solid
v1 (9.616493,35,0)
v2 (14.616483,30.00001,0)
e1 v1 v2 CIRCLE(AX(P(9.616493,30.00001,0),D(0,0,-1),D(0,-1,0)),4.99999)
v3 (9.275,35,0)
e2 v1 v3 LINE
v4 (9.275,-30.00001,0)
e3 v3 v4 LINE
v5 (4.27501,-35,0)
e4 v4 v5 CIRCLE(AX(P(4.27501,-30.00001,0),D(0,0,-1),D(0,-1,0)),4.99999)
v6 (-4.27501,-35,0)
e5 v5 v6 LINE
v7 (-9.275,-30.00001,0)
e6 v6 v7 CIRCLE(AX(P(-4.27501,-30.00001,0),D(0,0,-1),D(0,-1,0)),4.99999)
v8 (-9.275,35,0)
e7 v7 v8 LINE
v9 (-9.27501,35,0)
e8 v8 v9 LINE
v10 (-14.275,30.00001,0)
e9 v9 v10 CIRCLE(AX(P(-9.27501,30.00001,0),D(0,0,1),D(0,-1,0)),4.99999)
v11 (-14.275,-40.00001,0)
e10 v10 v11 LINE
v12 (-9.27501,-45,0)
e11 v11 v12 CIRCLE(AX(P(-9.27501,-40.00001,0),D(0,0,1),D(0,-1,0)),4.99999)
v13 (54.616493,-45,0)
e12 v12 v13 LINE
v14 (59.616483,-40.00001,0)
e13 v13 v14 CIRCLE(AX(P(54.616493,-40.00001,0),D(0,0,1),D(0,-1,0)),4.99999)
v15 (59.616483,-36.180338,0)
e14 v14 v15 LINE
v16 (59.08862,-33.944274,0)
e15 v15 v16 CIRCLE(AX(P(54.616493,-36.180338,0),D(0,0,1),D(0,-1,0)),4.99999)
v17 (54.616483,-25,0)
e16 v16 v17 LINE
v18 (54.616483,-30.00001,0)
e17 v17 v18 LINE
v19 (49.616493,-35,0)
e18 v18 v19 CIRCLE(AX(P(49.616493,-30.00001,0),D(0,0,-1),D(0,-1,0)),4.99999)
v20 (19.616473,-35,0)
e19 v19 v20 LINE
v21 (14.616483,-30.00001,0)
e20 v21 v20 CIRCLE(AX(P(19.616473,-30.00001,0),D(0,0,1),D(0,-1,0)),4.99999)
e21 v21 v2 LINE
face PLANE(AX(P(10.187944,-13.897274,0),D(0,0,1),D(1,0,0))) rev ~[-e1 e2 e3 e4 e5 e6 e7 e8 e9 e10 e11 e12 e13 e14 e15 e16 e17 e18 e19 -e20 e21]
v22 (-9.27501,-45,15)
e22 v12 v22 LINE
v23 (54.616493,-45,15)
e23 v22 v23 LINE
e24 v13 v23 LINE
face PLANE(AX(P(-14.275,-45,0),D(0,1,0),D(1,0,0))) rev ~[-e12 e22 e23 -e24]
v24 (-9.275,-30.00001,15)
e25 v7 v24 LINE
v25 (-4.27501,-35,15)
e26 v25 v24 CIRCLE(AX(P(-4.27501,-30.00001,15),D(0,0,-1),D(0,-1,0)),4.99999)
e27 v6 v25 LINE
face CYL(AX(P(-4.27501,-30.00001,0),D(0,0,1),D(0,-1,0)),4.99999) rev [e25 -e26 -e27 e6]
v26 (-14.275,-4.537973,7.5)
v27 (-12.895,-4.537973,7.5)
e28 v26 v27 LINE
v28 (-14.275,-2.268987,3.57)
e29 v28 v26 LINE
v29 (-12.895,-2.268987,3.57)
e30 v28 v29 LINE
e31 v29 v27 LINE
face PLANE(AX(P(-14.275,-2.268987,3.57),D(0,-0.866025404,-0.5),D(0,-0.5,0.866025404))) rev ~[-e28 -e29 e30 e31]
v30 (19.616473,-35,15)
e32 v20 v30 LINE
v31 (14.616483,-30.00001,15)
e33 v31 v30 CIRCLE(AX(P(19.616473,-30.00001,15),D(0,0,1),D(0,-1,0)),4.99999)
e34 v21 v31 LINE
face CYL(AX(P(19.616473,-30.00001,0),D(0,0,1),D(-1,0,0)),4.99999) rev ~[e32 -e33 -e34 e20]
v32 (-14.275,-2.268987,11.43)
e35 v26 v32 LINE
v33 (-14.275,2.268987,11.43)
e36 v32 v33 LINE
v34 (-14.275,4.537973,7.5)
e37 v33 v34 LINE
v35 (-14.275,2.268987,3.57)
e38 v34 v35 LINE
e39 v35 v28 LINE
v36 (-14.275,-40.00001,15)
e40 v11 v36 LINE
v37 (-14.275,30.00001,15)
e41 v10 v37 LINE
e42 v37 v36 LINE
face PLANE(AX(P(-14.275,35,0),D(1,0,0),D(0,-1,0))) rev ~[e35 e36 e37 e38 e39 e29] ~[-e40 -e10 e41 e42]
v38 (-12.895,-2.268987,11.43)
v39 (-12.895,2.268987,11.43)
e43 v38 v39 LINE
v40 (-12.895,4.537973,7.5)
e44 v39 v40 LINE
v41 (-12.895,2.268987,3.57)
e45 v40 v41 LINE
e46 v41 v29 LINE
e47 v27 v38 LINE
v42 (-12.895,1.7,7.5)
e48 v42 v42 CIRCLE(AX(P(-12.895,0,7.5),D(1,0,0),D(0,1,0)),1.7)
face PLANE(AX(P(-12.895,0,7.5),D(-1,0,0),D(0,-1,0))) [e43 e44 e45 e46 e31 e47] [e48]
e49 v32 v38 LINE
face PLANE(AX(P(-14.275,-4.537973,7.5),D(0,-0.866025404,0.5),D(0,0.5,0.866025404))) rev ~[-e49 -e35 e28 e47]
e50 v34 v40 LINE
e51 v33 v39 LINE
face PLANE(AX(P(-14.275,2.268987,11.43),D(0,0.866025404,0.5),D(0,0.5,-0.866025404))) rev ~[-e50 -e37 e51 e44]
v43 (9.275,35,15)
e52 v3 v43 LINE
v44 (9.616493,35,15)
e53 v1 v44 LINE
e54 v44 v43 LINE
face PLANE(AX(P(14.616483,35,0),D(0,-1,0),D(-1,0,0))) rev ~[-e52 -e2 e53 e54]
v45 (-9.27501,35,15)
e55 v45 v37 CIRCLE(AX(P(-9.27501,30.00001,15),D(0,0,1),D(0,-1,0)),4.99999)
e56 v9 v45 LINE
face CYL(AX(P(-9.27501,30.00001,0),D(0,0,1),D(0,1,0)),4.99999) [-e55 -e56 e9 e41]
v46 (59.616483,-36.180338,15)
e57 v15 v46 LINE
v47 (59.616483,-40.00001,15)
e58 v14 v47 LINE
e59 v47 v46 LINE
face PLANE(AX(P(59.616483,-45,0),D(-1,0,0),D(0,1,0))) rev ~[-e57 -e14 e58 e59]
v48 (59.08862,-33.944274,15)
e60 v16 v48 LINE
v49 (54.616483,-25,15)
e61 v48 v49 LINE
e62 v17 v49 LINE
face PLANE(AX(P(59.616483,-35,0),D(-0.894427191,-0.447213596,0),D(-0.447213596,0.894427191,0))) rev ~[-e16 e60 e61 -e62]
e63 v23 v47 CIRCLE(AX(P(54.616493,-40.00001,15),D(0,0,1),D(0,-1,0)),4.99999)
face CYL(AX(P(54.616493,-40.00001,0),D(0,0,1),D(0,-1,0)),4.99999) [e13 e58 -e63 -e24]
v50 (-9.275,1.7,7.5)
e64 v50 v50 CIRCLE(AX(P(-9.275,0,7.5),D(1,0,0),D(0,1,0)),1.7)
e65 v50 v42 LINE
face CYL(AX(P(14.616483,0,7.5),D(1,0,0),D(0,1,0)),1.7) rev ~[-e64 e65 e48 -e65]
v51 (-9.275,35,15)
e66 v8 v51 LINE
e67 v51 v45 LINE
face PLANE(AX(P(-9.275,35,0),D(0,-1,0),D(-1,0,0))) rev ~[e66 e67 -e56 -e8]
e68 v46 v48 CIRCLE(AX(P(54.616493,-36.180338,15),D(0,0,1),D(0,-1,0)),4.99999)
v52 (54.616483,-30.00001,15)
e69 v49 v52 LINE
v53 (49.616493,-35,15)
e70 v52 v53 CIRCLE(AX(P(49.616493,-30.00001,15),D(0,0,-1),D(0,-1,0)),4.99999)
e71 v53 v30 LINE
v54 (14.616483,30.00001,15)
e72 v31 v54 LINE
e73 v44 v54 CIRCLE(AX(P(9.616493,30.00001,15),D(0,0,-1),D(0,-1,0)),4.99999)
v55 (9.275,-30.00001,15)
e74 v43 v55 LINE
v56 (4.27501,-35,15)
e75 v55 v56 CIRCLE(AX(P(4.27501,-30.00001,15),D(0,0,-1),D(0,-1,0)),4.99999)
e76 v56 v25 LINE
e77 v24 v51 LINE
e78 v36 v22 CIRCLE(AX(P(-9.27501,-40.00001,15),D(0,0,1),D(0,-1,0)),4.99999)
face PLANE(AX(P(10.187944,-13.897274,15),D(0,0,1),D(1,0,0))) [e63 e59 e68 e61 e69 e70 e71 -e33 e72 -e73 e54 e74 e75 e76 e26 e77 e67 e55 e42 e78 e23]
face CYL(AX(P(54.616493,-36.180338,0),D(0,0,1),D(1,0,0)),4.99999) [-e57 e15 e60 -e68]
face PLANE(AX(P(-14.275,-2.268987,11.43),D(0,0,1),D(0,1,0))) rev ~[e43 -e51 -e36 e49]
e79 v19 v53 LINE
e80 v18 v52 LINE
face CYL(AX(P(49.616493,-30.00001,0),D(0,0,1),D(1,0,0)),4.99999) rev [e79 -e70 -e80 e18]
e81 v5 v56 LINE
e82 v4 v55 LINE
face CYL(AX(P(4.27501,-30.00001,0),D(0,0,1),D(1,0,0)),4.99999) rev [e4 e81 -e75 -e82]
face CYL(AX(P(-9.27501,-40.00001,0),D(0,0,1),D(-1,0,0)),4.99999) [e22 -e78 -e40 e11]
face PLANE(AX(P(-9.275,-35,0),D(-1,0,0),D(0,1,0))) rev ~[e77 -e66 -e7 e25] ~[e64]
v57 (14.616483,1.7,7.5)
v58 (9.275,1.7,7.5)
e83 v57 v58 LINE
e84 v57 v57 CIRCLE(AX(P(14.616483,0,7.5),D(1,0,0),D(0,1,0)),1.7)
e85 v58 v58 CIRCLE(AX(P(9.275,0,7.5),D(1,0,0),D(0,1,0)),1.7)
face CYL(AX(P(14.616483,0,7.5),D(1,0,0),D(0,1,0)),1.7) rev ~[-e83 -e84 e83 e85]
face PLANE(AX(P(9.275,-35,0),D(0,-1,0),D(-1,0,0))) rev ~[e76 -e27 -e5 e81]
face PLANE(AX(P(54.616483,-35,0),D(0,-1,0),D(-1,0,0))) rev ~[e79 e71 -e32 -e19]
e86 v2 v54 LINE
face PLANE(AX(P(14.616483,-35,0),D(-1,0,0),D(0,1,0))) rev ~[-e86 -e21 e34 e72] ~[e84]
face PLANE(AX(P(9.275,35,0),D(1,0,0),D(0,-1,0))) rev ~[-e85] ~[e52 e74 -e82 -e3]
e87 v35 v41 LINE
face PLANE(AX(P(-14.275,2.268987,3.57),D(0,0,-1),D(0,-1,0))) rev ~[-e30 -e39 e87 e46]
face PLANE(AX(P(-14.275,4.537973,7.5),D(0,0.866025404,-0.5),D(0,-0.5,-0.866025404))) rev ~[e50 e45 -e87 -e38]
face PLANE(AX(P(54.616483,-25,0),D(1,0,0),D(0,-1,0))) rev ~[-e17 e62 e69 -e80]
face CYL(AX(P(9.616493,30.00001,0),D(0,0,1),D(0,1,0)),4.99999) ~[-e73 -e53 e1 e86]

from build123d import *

# Parameters (mm, degrees)
F1_DEPTH = 15
F2_R     = 1.7
F3_DEPTH = 28.8924828911
F5_DEPTH = 1.38
F6_R     = 4.99999


# Not quite as in the source:
# - a fillet or chamfer is up to 0.001 mm smaller than in the source, because OpenCascade refuses the exact size


with BuildPart() as f1:
    # F0 (on Top) → F1 (new body)
    with BuildSketch(Plane.XY):
        Polygon((9.275, 35), (9.275, -35), (-9.275, -35), (-9.275, 35), (-14.275, 35), (-14.275, -35), (-14.275, -45), (59.6164828911, -45), (59.6164828911, -35), (54.6164828911, -25), (54.6164828911, -35), (14.6164828911, -35), (14.6164828911, 35), align=None)
    extrude(amount=F1_DEPTH)

    # F2 (on face) → F3 (cut, through all)
    with BuildSketch(Plane.YZ.offset(14.6164828911)):
        with Locations((0, 7.5)):
            Circle(F2_R)
    extrude(amount=-F3_DEPTH, mode=Mode.SUBTRACT)

    # F4 (on face) → F5 (cut)
    with BuildSketch(Plane(origin=(-14.275, 0, 0), x_dir=(0, -1, 0), z_dir=(-1, 0, 0))):
        Polygon((-2.2689865579, 3.57), (2.2689865579, 3.57), (4.5379731158, 7.5), (2.2689865579, 11.43), (-2.2689865579, 11.43), (-4.5379731158, 7.5), align=None)
    extrude(amount=-F5_DEPTH, mode=Mode.SUBTRACT)

    # F6 (radius 5 in the source; OpenCascade refuses exactly that, so slightly less here)
    f6_edges = [f1.edges().sort_by_distance(p)[0] for p in [
        (-9.275, -35, 7.5),
        (9.275, -35, 7.5),
        (-14.275, -45, 7.5),
        (59.616483, -45, 7.5),
        (54.616483, -35, 7.5),
        (14.616483, -35, 7.5),
        (59.616483, -35, 7.5),
        (14.616483, 35, 7.5),
        (-14.275, 35, 7.5),
    ]]
    fillet(f6_edges, radius=F6_R)


solid = f1.part
